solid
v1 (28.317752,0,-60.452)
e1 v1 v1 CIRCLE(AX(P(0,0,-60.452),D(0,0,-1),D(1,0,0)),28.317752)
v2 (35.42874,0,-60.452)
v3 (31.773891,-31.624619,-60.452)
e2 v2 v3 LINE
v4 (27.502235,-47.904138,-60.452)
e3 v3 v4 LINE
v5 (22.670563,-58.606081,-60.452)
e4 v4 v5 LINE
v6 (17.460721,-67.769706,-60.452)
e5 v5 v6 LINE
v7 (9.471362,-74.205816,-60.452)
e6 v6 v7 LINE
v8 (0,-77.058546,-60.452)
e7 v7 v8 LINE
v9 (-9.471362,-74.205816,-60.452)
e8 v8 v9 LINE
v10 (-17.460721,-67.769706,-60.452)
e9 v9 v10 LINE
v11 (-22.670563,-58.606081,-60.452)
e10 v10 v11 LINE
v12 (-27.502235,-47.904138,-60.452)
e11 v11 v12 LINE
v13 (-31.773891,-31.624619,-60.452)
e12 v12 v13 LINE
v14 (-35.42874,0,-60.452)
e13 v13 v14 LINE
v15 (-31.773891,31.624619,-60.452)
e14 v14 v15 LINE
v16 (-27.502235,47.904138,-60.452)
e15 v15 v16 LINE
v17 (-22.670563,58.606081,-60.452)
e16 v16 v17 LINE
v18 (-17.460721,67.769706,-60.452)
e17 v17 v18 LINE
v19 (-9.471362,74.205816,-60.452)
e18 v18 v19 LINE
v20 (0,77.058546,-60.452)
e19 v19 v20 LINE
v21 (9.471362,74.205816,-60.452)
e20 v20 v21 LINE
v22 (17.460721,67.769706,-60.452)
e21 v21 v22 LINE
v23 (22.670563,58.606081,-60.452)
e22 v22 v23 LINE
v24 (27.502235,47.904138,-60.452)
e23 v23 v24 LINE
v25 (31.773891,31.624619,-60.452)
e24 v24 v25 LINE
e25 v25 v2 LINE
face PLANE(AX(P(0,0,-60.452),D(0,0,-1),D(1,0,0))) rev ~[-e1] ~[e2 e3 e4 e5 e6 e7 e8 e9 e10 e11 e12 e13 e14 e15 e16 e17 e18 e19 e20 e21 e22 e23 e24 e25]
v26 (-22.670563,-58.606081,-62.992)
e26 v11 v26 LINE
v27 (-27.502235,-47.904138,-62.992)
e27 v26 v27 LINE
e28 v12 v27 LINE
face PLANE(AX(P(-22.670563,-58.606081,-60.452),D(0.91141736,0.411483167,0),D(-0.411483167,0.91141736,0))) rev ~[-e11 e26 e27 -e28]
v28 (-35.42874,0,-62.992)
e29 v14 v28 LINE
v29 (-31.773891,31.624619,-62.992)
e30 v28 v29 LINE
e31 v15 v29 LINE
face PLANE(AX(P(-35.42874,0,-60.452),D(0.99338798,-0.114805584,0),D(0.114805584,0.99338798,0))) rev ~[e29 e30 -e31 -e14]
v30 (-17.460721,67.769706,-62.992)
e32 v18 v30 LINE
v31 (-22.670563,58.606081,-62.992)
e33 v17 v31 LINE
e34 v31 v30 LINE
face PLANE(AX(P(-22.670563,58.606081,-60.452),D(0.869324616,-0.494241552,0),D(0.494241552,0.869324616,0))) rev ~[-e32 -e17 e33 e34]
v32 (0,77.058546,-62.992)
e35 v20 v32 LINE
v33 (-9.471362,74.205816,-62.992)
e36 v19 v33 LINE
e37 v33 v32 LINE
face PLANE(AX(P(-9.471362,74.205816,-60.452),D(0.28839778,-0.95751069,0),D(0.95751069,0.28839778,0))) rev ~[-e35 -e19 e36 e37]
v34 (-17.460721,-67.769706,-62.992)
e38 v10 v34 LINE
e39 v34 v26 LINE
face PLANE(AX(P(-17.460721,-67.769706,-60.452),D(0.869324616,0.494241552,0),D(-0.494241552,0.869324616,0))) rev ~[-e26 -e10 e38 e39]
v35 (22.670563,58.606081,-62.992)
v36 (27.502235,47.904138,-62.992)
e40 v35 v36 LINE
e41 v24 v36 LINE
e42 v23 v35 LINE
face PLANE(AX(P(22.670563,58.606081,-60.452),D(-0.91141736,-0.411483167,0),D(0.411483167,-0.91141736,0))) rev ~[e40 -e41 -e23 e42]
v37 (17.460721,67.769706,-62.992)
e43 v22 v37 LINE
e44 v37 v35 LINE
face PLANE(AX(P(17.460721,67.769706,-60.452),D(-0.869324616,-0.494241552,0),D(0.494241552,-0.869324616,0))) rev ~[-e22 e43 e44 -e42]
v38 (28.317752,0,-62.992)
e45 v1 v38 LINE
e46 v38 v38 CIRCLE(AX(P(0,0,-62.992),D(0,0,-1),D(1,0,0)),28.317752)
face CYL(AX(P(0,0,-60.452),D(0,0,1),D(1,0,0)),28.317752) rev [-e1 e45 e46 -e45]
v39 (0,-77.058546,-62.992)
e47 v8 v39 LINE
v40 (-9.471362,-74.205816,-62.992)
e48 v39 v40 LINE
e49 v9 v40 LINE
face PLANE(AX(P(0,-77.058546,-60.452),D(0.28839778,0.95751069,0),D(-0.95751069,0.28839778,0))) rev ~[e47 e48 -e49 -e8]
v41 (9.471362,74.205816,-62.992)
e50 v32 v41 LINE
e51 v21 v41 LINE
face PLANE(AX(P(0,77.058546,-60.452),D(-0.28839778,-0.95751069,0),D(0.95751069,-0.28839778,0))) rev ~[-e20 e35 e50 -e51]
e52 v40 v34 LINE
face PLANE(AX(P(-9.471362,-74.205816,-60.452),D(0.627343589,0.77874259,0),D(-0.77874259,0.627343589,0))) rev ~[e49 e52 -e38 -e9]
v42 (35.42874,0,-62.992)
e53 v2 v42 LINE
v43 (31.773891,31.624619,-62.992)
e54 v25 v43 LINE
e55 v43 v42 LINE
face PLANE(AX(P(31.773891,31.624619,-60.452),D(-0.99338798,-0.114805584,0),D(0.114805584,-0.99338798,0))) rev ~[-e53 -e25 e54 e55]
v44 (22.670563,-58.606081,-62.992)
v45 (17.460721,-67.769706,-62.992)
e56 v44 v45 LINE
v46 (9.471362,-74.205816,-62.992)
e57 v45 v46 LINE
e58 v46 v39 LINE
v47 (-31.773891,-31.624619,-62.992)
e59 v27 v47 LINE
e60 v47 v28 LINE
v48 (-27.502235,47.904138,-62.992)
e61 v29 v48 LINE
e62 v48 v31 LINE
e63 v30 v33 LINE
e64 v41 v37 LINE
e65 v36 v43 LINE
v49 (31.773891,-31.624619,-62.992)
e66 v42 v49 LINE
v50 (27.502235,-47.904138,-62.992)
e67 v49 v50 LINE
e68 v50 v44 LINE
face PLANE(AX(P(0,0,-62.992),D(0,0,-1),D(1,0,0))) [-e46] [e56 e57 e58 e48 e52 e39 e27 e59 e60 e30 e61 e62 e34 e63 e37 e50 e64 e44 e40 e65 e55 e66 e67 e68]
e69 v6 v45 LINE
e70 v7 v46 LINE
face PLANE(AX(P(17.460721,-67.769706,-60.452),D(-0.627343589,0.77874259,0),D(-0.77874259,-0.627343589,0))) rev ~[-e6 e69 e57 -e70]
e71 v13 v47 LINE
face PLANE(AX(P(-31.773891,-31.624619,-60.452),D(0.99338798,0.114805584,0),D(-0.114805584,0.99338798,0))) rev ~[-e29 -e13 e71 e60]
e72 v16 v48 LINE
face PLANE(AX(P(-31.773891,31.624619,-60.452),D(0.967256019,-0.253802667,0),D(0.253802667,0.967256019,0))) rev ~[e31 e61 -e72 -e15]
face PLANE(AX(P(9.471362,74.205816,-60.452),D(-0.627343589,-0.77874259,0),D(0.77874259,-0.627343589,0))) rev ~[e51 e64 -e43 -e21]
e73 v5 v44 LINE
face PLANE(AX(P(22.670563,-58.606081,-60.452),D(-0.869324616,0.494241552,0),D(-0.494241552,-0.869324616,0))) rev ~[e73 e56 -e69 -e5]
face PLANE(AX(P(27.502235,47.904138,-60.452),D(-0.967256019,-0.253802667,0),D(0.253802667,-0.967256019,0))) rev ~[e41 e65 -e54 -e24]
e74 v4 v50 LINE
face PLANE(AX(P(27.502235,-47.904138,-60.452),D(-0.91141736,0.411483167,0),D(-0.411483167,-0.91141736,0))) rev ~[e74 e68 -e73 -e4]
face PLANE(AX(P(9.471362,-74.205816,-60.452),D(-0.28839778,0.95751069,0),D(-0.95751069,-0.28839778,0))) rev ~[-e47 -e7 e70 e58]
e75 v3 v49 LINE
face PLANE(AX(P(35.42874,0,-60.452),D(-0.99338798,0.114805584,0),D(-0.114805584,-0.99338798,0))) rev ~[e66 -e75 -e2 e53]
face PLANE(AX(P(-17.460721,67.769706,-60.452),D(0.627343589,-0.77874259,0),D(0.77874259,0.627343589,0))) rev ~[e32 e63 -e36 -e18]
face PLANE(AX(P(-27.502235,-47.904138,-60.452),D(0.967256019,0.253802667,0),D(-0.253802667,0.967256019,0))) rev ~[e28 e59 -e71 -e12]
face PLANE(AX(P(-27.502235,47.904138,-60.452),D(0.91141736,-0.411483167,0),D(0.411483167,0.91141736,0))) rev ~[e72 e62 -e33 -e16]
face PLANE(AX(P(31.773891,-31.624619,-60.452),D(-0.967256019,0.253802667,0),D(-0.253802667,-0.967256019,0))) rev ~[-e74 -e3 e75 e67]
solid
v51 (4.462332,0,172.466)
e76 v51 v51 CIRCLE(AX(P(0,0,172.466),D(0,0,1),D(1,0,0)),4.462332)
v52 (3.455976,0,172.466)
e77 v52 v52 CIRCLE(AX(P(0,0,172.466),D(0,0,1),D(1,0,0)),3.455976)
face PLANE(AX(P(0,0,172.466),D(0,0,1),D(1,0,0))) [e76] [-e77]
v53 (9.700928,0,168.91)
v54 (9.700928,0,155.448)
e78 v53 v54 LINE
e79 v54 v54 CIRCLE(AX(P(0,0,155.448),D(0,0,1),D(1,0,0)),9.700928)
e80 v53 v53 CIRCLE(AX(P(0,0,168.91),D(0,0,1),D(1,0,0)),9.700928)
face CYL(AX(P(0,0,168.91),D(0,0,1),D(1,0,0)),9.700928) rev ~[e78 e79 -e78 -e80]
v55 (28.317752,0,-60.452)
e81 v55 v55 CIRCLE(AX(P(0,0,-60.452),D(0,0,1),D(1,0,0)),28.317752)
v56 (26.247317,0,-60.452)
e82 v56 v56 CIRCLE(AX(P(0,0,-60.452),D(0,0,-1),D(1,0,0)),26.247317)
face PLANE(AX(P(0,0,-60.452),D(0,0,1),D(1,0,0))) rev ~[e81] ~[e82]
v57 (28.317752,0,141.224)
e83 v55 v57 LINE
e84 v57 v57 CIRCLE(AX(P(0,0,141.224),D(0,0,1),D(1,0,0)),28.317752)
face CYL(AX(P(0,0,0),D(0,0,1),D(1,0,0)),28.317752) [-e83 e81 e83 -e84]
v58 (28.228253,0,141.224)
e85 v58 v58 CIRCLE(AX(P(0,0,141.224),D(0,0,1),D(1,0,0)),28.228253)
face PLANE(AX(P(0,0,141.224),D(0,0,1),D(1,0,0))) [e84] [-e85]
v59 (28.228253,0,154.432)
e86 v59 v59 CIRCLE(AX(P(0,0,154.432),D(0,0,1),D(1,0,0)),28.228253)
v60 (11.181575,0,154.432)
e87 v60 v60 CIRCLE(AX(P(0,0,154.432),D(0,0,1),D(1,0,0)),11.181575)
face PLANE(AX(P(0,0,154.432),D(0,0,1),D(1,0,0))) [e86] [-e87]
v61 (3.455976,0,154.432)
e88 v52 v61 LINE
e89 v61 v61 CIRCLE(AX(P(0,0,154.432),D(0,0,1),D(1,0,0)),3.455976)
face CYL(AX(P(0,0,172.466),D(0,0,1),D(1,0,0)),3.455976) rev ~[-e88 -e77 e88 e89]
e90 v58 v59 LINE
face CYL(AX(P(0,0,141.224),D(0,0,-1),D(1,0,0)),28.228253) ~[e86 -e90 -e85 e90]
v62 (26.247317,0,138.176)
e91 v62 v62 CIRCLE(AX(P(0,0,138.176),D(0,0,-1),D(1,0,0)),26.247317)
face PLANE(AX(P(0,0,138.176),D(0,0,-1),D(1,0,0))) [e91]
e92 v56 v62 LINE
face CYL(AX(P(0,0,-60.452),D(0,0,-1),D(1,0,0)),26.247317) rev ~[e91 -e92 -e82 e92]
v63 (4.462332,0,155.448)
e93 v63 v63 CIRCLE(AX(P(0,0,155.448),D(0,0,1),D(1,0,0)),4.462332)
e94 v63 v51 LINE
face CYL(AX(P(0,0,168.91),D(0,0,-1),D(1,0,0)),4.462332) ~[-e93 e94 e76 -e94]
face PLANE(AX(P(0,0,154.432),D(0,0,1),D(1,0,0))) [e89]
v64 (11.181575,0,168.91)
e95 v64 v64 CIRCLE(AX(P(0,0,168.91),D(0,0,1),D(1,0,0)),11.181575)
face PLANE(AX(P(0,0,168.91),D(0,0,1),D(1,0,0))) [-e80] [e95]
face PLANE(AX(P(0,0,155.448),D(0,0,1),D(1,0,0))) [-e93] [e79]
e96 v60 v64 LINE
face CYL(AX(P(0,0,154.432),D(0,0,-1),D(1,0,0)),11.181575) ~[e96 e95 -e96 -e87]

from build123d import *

# Parameters (mm, degrees)
F0_R      = 28.3177523181
F1_DEPTH  = 141.224
F2_DEPTH  = 60.452
F3_R      = 26.2473166526
F4_DEPTH  = 198.628
F5_R      = 28.3177523181
F6_DEPTH  = 2.54
F7_R      = 28.2282534547
F8_DEPTH  = 13.208
F9_R      = 11.1815753047
F10_DEPTH = 14.478
F11_R     = 9.7009276287
F12_DEPTH = 13.462
F13_R     = 4.462331727
F14_DEPTH = 14.478
F15_DEPTH = 3.556
F16_R     = 3.4559757879
F17_DEPTH = 18.034


# Not quite as in the source:
# - a feature names something its author has since deleted; it is built from what else it names


with BuildPart() as f1:
    # F0 (on Top) → F1 (new body)
    with BuildSketch(Plane.XY):
        Circle(F0_R)
    extrude(amount=F1_DEPTH)

    # F2 (add): a face of the model
    f2_faces = [f1.faces().sort_by_distance(p)[0] for p in [
        (0, 0, 0),
    ]]
    extrude(f2_faces, amount=F2_DEPTH)

    # F3 (on face) → F4 (cut)
    with BuildSketch(Plane(origin=(0, 0, -60.452), x_dir=(1, 0, 0), z_dir=(0, 0, -1))):
        Circle(F3_R)
    extrude(amount=-F4_DEPTH, mode=Mode.SUBTRACT)

    # F7 (on face) → F8 (join)
    with BuildSketch(Plane.XY.offset(141.224)):
        Circle(F7_R)
    extrude(amount=F8_DEPTH)

    # F9 (on face) → F10 (join)
    with BuildSketch(Plane.XY.offset(154.432)):
        Circle(F9_R)
    extrude(amount=F10_DEPTH)

    # F11 (on face) → F12 (cut)
    with BuildSketch(Plane.XY.offset(168.91)):
        Circle(F11_R)
    extrude(amount=-F12_DEPTH, mode=Mode.SUBTRACT)

    # F13 (on face) → F14 (join)
    with BuildSketch(Plane.XY.offset(168.91)):
        Circle(F13_R)
    extrude(amount=-F14_DEPTH)

    # F15 (add): a face of the model
    f15_faces = [f1.faces().sort_by_distance(p)[0] for p in [
        (0, 0, 168.91),
    ]]
    extrude(f15_faces, amount=F15_DEPTH)

    # F16 (on face) → F17 (cut)
    with BuildSketch(Plane.XY.offset(172.466)):
        Circle(F16_R)
    extrude(amount=-F17_DEPTH, mode=Mode.SUBTRACT)


with BuildPart() as f6:
    # F5 (on face) → F6 (new body)
    with BuildSketch(Plane(origin=(0, 0, -60.452), x_dir=(1, 0, 0), z_dir=(0, 0, -1))):
        Polygon((9.4713624567, 74.2058157921), (0, 77.0585462451), (-9.4713624567, 74.2058157921), (-17.4607206136, 67.7697062492), (-22.6705633104, 58.6060807109), (-27.5022350252, 47.904137522), (-31.7738913, 31.6246189177), (-35.4287400842, 0), (-31.7738913, -31.6246189177), (-27.5022350252, -47.904137522), (-22.6705633104, -58.6060807109), (-17.4607206136, -67.7697062492), (-9.4713624567, -74.2058157921), (0, -77.0585462451), (9.4713624567, -74.2058157921), (17.4607206136, -67.7697062492), (22.6705633104, -58.6060807109), (27.5022350252, -47.904137522), (31.7738913, -31.6246189177), (35.4287400842, 0), (31.7738913, 31.6246189177), (27.5022350252, 47.904137522), (22.6705633104, 58.6060807109), (17.4607206136, 67.7697062492), align=None)
        Circle(F5_R, mode=Mode.SUBTRACT)
    extrude(amount=F6_DEPTH)


solid = Compound([f1.part, f6.part])
